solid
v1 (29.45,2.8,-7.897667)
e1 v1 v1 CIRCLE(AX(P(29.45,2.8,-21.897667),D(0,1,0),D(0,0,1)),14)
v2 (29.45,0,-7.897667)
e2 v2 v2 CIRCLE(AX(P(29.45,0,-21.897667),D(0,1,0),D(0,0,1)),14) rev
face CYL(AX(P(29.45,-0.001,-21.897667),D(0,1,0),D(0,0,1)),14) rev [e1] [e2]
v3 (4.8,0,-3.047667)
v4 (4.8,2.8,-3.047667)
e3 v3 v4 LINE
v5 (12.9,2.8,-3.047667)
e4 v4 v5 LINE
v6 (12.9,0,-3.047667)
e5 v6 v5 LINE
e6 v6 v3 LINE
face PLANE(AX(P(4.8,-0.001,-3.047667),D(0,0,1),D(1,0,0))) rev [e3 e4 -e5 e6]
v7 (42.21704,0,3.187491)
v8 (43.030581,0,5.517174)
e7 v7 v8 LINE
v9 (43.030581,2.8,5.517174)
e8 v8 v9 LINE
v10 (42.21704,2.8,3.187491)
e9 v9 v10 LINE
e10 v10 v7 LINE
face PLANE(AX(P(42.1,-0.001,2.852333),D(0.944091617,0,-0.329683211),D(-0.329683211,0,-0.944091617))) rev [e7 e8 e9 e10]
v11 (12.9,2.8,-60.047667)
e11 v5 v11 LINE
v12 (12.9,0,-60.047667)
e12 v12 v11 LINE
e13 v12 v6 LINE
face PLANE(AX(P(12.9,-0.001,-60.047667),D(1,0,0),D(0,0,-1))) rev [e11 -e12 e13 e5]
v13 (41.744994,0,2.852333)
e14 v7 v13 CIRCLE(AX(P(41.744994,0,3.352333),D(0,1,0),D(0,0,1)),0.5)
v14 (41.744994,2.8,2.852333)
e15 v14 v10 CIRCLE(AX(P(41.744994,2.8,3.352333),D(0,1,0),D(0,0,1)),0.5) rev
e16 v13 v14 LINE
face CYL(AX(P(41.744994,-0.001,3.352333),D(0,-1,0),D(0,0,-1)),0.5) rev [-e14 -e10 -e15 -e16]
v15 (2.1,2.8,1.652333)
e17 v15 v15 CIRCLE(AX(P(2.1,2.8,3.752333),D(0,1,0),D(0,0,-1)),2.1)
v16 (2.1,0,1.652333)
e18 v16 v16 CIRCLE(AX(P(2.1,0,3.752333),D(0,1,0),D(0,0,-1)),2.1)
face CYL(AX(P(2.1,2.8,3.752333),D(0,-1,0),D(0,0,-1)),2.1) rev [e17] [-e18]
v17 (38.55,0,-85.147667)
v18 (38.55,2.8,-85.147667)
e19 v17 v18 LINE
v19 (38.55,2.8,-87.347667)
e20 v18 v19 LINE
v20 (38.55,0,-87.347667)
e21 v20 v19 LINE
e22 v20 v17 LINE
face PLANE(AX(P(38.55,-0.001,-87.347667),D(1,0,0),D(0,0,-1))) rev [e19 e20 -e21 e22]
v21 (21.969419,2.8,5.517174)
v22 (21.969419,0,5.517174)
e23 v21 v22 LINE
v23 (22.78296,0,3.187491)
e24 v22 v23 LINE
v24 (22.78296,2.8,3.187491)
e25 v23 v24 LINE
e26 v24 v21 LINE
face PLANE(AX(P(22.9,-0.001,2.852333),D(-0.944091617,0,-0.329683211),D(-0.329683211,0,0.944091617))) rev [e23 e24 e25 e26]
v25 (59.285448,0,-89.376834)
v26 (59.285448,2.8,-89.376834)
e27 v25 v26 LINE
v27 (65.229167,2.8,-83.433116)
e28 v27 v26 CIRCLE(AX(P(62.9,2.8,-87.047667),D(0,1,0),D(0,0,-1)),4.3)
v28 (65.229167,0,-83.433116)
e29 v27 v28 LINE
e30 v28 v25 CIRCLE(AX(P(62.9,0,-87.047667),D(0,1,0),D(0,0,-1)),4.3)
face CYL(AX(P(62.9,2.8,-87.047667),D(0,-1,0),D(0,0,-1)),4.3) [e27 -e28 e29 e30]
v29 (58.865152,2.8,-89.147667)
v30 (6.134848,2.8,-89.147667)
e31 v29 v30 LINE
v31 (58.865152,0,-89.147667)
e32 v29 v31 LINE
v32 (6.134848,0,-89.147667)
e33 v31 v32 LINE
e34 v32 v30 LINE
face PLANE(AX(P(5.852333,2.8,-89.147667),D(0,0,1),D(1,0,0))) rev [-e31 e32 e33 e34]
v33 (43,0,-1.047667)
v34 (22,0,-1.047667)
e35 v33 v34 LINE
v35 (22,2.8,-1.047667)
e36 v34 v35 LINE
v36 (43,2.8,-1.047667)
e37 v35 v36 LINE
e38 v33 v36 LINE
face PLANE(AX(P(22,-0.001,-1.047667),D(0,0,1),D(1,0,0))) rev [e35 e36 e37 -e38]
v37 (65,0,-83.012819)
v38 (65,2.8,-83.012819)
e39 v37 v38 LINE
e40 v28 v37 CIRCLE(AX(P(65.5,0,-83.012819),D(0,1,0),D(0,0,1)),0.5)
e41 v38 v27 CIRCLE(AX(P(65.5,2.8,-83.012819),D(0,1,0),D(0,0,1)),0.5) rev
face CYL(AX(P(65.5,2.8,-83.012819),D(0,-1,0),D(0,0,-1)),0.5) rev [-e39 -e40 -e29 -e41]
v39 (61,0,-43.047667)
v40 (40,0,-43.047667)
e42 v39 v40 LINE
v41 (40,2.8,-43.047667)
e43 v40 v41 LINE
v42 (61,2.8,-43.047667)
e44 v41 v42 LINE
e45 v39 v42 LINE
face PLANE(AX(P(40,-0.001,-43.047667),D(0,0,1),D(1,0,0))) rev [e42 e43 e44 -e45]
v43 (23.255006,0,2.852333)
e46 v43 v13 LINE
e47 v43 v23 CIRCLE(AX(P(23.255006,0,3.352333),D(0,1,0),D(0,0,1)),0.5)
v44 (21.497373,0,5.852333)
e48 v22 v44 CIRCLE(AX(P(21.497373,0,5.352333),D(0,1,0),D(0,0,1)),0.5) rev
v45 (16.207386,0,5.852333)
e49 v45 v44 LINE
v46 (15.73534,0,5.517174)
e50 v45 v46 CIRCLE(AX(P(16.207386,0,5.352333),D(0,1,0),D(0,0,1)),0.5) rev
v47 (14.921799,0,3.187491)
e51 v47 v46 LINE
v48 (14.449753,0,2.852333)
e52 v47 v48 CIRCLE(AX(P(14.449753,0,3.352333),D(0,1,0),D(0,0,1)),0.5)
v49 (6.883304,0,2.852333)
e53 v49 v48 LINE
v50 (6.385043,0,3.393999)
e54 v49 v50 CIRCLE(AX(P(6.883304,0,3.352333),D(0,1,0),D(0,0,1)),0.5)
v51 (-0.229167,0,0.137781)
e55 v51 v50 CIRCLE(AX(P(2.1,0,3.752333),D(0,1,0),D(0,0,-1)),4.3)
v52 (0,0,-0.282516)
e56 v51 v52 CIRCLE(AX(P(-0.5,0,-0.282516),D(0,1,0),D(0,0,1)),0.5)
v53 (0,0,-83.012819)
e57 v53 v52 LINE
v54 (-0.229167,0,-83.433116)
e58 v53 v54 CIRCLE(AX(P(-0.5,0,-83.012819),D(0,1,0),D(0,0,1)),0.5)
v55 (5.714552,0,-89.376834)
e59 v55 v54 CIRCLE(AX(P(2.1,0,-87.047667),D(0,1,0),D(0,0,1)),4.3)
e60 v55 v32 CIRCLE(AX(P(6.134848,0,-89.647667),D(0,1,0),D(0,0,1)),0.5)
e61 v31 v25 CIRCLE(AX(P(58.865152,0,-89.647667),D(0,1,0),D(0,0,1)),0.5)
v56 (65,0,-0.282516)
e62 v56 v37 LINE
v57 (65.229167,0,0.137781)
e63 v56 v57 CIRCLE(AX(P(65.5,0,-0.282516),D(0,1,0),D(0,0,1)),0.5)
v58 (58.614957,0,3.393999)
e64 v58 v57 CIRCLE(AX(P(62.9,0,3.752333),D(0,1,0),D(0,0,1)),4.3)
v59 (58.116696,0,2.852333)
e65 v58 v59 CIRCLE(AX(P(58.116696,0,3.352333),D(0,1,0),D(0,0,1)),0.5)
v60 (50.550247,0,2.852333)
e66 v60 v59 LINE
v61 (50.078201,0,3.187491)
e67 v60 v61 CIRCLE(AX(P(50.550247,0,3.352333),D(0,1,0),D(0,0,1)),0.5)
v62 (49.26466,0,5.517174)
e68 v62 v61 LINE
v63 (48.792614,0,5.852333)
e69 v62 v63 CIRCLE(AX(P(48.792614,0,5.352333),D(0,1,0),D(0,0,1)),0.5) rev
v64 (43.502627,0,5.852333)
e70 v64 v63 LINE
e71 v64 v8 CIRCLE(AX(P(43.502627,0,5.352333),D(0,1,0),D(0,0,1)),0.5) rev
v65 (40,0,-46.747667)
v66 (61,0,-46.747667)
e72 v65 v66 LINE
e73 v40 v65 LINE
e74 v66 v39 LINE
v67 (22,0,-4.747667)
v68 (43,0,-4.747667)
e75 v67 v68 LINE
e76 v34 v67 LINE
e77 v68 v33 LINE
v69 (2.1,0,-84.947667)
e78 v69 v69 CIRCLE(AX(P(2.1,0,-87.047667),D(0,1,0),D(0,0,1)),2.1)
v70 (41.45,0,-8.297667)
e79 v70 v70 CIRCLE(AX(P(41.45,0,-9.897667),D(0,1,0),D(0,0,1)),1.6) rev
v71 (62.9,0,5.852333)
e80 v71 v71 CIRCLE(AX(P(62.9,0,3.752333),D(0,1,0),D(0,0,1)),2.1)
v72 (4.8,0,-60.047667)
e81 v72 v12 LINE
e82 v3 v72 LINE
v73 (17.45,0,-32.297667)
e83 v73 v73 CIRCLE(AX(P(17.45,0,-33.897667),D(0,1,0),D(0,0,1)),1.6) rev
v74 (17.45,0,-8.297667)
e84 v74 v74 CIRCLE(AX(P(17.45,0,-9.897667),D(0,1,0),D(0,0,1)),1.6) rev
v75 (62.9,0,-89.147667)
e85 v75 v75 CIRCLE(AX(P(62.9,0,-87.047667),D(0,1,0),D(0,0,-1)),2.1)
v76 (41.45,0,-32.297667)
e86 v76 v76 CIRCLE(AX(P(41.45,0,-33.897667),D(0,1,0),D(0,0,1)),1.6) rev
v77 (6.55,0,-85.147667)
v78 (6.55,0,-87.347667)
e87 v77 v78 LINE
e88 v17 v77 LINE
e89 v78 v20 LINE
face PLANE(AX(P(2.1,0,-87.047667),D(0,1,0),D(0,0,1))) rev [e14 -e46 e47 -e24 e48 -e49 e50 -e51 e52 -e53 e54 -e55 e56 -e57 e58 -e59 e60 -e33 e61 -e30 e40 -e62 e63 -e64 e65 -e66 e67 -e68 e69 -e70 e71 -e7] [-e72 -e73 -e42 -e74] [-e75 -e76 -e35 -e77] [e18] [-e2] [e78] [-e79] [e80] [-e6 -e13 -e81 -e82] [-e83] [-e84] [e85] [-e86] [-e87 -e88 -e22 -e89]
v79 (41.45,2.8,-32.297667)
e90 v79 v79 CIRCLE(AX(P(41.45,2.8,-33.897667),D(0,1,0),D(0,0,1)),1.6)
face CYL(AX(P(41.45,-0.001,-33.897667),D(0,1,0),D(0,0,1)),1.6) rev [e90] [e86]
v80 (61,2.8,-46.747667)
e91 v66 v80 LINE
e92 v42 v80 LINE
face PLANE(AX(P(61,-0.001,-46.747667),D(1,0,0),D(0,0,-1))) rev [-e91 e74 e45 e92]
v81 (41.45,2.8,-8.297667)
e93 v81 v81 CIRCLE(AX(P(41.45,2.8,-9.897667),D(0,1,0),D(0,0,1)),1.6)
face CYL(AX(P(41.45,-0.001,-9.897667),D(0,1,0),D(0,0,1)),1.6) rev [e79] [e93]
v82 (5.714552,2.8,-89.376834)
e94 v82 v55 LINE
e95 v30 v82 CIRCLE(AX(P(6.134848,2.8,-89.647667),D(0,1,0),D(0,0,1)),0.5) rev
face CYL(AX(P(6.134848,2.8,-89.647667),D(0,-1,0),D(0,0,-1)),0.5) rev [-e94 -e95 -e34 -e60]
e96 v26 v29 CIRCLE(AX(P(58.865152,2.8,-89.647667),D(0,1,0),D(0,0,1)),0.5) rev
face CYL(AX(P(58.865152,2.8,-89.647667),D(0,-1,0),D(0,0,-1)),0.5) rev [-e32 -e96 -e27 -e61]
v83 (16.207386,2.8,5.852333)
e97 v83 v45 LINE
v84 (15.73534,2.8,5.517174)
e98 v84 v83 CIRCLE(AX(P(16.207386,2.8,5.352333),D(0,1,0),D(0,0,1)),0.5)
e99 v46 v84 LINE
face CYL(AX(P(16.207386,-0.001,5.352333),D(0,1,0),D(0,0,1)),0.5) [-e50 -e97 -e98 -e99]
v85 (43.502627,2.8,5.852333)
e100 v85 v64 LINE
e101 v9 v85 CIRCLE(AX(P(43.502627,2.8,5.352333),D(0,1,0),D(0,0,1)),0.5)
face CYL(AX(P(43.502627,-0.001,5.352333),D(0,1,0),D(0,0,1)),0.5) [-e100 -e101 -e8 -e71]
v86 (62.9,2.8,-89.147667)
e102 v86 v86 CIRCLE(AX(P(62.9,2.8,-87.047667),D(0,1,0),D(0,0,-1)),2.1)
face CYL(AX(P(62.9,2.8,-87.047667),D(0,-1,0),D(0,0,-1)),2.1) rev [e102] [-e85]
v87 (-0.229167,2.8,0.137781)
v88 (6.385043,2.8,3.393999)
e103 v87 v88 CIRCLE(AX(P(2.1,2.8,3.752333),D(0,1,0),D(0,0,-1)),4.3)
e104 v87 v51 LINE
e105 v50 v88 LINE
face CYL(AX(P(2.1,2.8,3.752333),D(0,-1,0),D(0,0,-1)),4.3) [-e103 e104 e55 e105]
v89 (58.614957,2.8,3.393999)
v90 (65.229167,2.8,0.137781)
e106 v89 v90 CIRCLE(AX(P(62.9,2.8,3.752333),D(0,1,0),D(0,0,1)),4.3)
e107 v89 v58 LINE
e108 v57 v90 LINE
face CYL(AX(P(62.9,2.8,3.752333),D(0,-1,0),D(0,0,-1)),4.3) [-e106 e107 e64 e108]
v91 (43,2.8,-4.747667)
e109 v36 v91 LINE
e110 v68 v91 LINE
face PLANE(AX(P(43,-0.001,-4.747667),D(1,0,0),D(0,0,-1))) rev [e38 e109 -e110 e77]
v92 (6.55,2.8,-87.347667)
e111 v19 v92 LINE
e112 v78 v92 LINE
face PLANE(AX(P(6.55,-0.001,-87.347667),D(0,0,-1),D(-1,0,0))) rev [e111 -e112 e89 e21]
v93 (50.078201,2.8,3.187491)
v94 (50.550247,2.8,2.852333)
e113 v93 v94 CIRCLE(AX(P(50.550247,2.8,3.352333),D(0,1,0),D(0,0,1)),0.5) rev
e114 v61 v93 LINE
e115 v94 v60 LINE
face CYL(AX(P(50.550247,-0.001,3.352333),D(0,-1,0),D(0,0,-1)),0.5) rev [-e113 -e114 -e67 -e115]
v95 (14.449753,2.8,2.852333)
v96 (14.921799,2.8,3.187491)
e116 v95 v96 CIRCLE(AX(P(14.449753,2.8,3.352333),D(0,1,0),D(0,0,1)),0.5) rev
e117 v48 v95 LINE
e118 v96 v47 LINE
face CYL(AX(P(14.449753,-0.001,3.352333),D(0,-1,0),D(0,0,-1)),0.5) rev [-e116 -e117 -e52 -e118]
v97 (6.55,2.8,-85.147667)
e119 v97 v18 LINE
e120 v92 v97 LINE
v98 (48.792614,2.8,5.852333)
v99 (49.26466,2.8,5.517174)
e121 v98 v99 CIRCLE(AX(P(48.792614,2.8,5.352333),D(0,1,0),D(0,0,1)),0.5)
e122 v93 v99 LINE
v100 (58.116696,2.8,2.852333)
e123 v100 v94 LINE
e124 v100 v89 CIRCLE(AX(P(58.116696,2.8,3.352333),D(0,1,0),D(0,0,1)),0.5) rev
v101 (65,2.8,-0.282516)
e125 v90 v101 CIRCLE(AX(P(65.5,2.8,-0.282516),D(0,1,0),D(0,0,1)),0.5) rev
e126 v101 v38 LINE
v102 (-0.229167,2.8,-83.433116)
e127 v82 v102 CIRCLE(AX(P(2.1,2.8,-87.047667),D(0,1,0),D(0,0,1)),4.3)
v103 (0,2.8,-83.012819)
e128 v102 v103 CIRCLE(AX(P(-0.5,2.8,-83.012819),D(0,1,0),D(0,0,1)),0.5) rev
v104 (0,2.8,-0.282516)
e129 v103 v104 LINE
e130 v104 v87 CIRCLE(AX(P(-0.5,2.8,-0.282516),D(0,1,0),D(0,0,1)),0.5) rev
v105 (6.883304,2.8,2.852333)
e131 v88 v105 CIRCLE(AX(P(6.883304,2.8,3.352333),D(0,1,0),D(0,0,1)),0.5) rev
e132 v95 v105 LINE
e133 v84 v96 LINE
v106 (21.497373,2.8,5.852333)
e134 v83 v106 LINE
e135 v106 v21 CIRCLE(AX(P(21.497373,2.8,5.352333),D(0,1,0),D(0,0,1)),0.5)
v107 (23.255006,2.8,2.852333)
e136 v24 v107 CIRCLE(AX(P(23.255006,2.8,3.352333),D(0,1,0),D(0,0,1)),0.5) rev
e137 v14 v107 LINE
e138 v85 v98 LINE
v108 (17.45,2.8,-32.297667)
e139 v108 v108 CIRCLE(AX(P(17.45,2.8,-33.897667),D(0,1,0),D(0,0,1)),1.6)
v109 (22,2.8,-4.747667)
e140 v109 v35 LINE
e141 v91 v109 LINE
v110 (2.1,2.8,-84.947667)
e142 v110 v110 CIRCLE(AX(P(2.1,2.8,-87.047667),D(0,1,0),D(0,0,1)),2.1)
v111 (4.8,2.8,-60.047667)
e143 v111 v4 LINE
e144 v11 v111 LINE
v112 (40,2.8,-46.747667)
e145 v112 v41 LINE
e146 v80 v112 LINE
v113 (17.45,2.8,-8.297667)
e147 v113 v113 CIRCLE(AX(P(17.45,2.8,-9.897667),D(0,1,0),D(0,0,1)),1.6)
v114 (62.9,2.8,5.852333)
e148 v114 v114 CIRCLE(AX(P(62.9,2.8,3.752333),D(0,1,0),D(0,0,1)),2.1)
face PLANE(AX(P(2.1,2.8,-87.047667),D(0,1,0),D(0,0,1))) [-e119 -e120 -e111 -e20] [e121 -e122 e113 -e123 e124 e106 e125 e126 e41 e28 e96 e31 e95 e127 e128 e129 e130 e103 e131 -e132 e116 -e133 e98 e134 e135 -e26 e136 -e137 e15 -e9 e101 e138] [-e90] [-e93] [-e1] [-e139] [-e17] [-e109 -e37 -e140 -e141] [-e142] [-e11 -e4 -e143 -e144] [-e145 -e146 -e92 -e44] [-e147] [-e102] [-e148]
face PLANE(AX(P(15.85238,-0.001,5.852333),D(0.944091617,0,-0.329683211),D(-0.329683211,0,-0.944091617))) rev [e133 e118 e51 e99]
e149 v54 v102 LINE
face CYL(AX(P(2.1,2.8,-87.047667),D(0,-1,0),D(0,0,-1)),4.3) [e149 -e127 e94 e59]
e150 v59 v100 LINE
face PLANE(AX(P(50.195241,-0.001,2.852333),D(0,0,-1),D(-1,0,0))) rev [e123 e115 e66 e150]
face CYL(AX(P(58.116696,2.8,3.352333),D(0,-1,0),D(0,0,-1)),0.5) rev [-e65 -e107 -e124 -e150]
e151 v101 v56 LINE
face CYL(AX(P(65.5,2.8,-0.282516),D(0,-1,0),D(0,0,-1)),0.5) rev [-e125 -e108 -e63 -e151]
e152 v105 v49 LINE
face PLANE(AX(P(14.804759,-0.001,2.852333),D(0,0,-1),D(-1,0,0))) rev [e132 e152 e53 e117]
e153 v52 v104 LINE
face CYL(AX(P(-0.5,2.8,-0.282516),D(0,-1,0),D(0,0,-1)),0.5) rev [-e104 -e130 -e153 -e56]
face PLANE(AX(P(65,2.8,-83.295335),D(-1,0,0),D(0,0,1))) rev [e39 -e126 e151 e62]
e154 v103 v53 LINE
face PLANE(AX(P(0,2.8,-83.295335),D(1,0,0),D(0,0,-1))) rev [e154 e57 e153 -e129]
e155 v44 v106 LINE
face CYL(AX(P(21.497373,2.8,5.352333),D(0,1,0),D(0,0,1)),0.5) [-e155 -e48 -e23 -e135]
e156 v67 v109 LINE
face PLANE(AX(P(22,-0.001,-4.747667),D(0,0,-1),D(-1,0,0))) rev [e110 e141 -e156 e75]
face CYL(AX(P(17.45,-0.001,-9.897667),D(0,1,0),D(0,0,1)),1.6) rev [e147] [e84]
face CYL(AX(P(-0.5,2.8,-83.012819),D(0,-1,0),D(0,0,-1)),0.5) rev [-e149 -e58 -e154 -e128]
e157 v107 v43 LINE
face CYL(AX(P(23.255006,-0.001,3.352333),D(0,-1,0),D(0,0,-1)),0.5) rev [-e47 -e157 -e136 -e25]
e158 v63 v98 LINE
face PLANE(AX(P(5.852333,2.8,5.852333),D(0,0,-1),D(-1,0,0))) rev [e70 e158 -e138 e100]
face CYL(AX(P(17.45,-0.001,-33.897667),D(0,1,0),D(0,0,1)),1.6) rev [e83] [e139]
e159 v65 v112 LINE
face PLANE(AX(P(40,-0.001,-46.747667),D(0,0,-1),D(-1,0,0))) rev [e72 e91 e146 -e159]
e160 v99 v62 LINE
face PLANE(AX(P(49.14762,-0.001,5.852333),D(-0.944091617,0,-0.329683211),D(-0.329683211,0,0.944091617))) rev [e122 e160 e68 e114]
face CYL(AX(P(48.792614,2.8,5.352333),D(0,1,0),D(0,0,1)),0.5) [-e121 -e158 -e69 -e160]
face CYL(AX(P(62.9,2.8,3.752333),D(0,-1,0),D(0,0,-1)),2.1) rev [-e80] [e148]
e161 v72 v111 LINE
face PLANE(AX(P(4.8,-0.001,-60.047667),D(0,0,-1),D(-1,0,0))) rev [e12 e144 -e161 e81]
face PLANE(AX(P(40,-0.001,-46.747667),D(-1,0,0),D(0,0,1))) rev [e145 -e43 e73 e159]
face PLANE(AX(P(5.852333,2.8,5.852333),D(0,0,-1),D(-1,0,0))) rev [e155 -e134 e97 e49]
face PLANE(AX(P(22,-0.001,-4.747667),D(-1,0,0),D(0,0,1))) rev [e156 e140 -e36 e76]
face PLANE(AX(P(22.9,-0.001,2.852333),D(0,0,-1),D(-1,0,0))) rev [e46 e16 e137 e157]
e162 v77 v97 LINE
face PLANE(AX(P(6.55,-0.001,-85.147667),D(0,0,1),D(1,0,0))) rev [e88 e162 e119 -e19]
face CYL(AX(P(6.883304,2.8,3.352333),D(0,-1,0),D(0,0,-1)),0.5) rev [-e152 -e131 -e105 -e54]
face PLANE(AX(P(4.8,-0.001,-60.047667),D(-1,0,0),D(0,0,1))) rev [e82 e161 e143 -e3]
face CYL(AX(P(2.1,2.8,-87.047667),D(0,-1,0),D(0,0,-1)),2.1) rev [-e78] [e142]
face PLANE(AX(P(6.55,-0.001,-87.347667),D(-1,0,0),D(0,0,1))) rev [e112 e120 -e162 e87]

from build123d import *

# Parameters (mm, degrees)
BASEPLATE_OUTLINE_R = 2.1
BASEPLATE_DEPTH     = 2.8
CUT_EXTRUDE1_REACH  = 115.438
SKETCH3_R           = 14
SKETCH3_R_2         = 1.6
SKETCH3_W           = 21
SKETCH3_H           = 3.7
SKETCH3_W_2         = 32
SKETCH3_H_2         = 2.2
SKETCH3_W_3         = 8.1
SKETCH3_H_3         = 57


# Read off the part's stored shape, not the designer's step: BasePlate
with BuildPart() as part:
    # BasePlate outline → BasePlate (new body)
    with BuildSketch(Plane(origin=(0, 0, 0), x_dir=(1, 0, 0), z_dir=(0, 1, 0))):
        with BuildLine():
            Line((43.502626614, -5.852332608), (48.792614178, -5.852332608))
            ThreePointArc((48.792614178, -5.852332608), (49.082078508, -5.760021707), (49.264659986, -5.517174213))
            Line((49.264659986, -5.517174213), (50.078201202, -3.187491002))
            ThreePointArc((50.078201202, -3.187491002), (50.26078268, -2.944643509), (50.55024701, -2.852332608))
            Line((50.55024701, -2.852332608), (58.116695703, -2.852332608))
            ThreePointArc((58.116695703, -2.852332608), (58.484685739, -3.013831008), (58.614956567, -3.393999275))
            ThreePointArc((58.614956567, -3.393999275), (64.799237397, -7.61016844), (65.229166667, -0.137781095))
            ThreePointArc((65.229166667, -0.137781095), (65.061014427, 0.043158816), (65, 0.282515593))
            Line((65, 0.282515593), (65, 83.012819192))
            ThreePointArc((65, 83.012819192), (65.061014427, 83.252175969), (65.229166667, 83.433115879))
            ThreePointArc((65.229166667, 83.433115879), (65.940559159, 90.088226551), (59.285448487, 89.376834059))
            ThreePointArc((59.285448487, 89.376834059), (59.104508577, 89.208681819), (58.8651518, 89.147667392))
            Line((58.8651518, 89.147667392), (6.1348482, 89.147667392))
            ThreePointArc((6.1348482, 89.147667392), (5.895491423, 89.208681819), (5.714551513, 89.376834059))
            ThreePointArc((5.714551513, 89.376834059), (-0.940559159, 90.088226551), (-0.229166667, 83.433115879))
            ThreePointArc((-0.229166667, 83.433115879), (-0.061014427, 83.252175969), (0, 83.012819192))
            Line((0, 83.012819192), (0, 0.282515593))
            ThreePointArc((0, 0.282515593), (-0.061014427, 0.043158816), (-0.229166667, -0.137781095))
            ThreePointArc((-0.229166667, -0.137781095), (0.200762603, -7.61016844), (6.385043433, -3.393999275))
            ThreePointArc((6.385043433, -3.393999275), (6.515314261, -3.013831008), (6.883304297, -2.852332608))
            Line((6.883304297, -2.852332608), (14.44975299, -2.852332608))
            ThreePointArc((14.44975299, -2.852332608), (14.73921732, -2.944643509), (14.921798798, -3.187491002))
            Line((14.921798798, -3.187491002), (15.735340014, -5.517174213))
            ThreePointArc((15.735340014, -5.517174213), (15.917921492, -5.760021707), (16.207385822, -5.852332608))
            Line((16.207385822, -5.852332608), (21.497373386, -5.852332608))
            ThreePointArc((21.497373386, -5.852332608), (21.786837716, -5.760021707), (21.969419194, -5.517174213))
            Line((21.969419194, -5.517174213), (22.78296041, -3.187491002))
            ThreePointArc((22.78296041, -3.187491002), (22.965541888, -2.944643509), (23.255006218, -2.852332608))
            Line((23.255006218, -2.852332608), (41.744993782, -2.852332608))
            ThreePointArc((41.744993782, -2.852332608), (42.034458112, -2.944643509), (42.21703959, -3.187491002))
            Line((42.21703959, -3.187491002), (43.030580806, -5.517174213))
            ThreePointArc((43.030580806, -5.517174213), (43.213162284, -5.760021707), (43.502626614, -5.852332608))
        make_face()
        with Locations((2.1, -3.752332608)):
            Circle(BASEPLATE_OUTLINE_R, mode=Mode.SUBTRACT)
        with Locations((62.9, -3.752332608)):
            Circle(BASEPLATE_OUTLINE_R, mode=Mode.SUBTRACT)
        with Locations((2.1, 87.047667392)):
            Circle(BASEPLATE_OUTLINE_R, mode=Mode.SUBTRACT)
        with Locations((62.9, 87.047667392)):
            Circle(BASEPLATE_OUTLINE_R, mode=Mode.SUBTRACT)
    extrude(amount=BASEPLATE_DEPTH)

    # Sketch3 → Cut-Extrude1 (cut, up to next)
    with BuildSketch(Plane(origin=(0, 2.8, 0), x_dir=(1, 0, 0), z_dir=(0, 1, 0)), mode=Mode.PRIVATE) as cut_extrude1_sk1:
        with Locations(Location((29.45, 21.897667392, 0), (0, 0, 270))):
            Circle(SKETCH3_R)
    cut_extrude1_tool1 = extrude(cut_extrude1_sk1.sketch, amount=-CUT_EXTRUDE1_REACH, mode=Mode.PRIVATE) & part.part
    # Sketch3 → Cut-Extrude1 (cut, up to next)
    with BuildSketch(Plane(origin=(0, 2.8, 0), x_dir=(1, 0, 0), z_dir=(0, 1, 0)), mode=Mode.PRIVATE) as cut_extrude1_sk2:
        with Locations(Location((41.45, 33.897667392, 0), (0, 0, 270))):
            Circle(SKETCH3_R_2)
    cut_extrude1_tool2 = extrude(cut_extrude1_sk2.sketch, amount=-CUT_EXTRUDE1_REACH, mode=Mode.PRIVATE) & part.part
    # Sketch3 → Cut-Extrude1 (cut, up to next)
    with BuildSketch(Plane(origin=(0, 2.8, 0), x_dir=(1, 0, 0), z_dir=(0, 1, 0)), mode=Mode.PRIVATE) as cut_extrude1_sk3:
        with Locations(Location((41.45, 9.897667392, 0), (0, 0, 270))):
            Circle(SKETCH3_R_2)
    cut_extrude1_tool3 = extrude(cut_extrude1_sk3.sketch, amount=-CUT_EXTRUDE1_REACH, mode=Mode.PRIVATE) & part.part
    # Sketch3 → Cut-Extrude1 (cut, up to next)
    with BuildSketch(Plane(origin=(0, 2.8, 0), x_dir=(1, 0, 0), z_dir=(0, 1, 0)), mode=Mode.PRIVATE) as cut_extrude1_sk4:
        with Locations(Location((17.45, 9.897667392, 0), (0, 0, 270))):
            Circle(SKETCH3_R_2)
    cut_extrude1_tool4 = extrude(cut_extrude1_sk4.sketch, amount=-CUT_EXTRUDE1_REACH, mode=Mode.PRIVATE) & part.part
    # Sketch3 → Cut-Extrude1 (cut, up to next)
    with BuildSketch(Plane(origin=(0, 2.8, 0), x_dir=(1, 0, 0), z_dir=(0, 1, 0)), mode=Mode.PRIVATE) as cut_extrude1_sk5:
        with Locations(Location((17.45, 33.897667392, 0), (0, 0, 270))):
            Circle(SKETCH3_R_2)
    cut_extrude1_tool5 = extrude(cut_extrude1_sk5.sketch, amount=-CUT_EXTRUDE1_REACH, mode=Mode.PRIVATE) & part.part
    # Sketch3 → Cut-Extrude1 (cut, up to next)
    with BuildSketch(Plane(origin=(0, 2.8, 0), x_dir=(1, 0, 0), z_dir=(0, 1, 0)), mode=Mode.PRIVATE) as cut_extrude1_sk6:
        with Locations((32.5, 2.897667392)):
            Rectangle(SKETCH3_W, SKETCH3_H)
    cut_extrude1_tool6 = extrude(cut_extrude1_sk6.sketch, amount=-CUT_EXTRUDE1_REACH, mode=Mode.PRIVATE) & part.part
    # Sketch3 → Cut-Extrude1 (cut, up to next)
    with BuildSketch(Plane(origin=(0, 2.8, 0), x_dir=(1, 0, 0), z_dir=(0, 1, 0)), mode=Mode.PRIVATE) as cut_extrude1_sk7:
        with Locations((50.5, 44.897667392)):
            Rectangle(SKETCH3_W, SKETCH3_H)
    cut_extrude1_tool7 = extrude(cut_extrude1_sk7.sketch, amount=-CUT_EXTRUDE1_REACH, mode=Mode.PRIVATE) & part.part
    # Sketch3 → Cut-Extrude1 (cut, up to next)
    with BuildSketch(Plane(origin=(0, 2.8, 0), x_dir=(1, 0, 0), z_dir=(0, 1, 0)), mode=Mode.PRIVATE) as cut_extrude1_sk8:
        with Locations((22.55, 86.247667392)):
            Rectangle(SKETCH3_W_2, SKETCH3_H_2)
    cut_extrude1_tool8 = extrude(cut_extrude1_sk8.sketch, amount=-CUT_EXTRUDE1_REACH, mode=Mode.PRIVATE) & part.part
    # Sketch3 → Cut-Extrude1 (cut, up to next)
    with BuildSketch(Plane(origin=(0, 2.8, 0), x_dir=(1, 0, 0), z_dir=(0, 1, 0)), mode=Mode.PRIVATE) as cut_extrude1_sk9:
        with Locations((8.85, 31.547667392)):
            Rectangle(SKETCH3_W_3, SKETCH3_H_3)
    cut_extrude1_tool9 = extrude(cut_extrude1_sk9.sketch, amount=-CUT_EXTRUDE1_REACH, mode=Mode.PRIVATE) & part.part
    add(cut_extrude1_tool1.solids().sort_by_distance((29.45, 2.8, -21.897667))[0], mode=Mode.SUBTRACT)
    add(cut_extrude1_tool2.solids().sort_by_distance((41.45, 2.8, -33.897667))[0], mode=Mode.SUBTRACT)
    add(cut_extrude1_tool3.solids().sort_by_distance((41.45, 2.8, -9.897667))[0], mode=Mode.SUBTRACT)
    add(cut_extrude1_tool4.solids().sort_by_distance((17.45, 2.8, -9.897667))[0], mode=Mode.SUBTRACT)
    add(cut_extrude1_tool5.solids().sort_by_distance((17.45, 2.8, -33.897667))[0], mode=Mode.SUBTRACT)
    add(cut_extrude1_tool6.solids().sort_by_distance((32.5, 2.8, -2.897667))[0], mode=Mode.SUBTRACT)
    add(cut_extrude1_tool7.solids().sort_by_distance((50.5, 2.8, -44.897667))[0], mode=Mode.SUBTRACT)
    add(cut_extrude1_tool8.solids().sort_by_distance((22.55, 2.8, -86.247667))[0], mode=Mode.SUBTRACT)
    add(cut_extrude1_tool9.solids().sort_by_distance((8.85, 2.8, -31.547667))[0], mode=Mode.SUBTRACT)


solid = part.part
